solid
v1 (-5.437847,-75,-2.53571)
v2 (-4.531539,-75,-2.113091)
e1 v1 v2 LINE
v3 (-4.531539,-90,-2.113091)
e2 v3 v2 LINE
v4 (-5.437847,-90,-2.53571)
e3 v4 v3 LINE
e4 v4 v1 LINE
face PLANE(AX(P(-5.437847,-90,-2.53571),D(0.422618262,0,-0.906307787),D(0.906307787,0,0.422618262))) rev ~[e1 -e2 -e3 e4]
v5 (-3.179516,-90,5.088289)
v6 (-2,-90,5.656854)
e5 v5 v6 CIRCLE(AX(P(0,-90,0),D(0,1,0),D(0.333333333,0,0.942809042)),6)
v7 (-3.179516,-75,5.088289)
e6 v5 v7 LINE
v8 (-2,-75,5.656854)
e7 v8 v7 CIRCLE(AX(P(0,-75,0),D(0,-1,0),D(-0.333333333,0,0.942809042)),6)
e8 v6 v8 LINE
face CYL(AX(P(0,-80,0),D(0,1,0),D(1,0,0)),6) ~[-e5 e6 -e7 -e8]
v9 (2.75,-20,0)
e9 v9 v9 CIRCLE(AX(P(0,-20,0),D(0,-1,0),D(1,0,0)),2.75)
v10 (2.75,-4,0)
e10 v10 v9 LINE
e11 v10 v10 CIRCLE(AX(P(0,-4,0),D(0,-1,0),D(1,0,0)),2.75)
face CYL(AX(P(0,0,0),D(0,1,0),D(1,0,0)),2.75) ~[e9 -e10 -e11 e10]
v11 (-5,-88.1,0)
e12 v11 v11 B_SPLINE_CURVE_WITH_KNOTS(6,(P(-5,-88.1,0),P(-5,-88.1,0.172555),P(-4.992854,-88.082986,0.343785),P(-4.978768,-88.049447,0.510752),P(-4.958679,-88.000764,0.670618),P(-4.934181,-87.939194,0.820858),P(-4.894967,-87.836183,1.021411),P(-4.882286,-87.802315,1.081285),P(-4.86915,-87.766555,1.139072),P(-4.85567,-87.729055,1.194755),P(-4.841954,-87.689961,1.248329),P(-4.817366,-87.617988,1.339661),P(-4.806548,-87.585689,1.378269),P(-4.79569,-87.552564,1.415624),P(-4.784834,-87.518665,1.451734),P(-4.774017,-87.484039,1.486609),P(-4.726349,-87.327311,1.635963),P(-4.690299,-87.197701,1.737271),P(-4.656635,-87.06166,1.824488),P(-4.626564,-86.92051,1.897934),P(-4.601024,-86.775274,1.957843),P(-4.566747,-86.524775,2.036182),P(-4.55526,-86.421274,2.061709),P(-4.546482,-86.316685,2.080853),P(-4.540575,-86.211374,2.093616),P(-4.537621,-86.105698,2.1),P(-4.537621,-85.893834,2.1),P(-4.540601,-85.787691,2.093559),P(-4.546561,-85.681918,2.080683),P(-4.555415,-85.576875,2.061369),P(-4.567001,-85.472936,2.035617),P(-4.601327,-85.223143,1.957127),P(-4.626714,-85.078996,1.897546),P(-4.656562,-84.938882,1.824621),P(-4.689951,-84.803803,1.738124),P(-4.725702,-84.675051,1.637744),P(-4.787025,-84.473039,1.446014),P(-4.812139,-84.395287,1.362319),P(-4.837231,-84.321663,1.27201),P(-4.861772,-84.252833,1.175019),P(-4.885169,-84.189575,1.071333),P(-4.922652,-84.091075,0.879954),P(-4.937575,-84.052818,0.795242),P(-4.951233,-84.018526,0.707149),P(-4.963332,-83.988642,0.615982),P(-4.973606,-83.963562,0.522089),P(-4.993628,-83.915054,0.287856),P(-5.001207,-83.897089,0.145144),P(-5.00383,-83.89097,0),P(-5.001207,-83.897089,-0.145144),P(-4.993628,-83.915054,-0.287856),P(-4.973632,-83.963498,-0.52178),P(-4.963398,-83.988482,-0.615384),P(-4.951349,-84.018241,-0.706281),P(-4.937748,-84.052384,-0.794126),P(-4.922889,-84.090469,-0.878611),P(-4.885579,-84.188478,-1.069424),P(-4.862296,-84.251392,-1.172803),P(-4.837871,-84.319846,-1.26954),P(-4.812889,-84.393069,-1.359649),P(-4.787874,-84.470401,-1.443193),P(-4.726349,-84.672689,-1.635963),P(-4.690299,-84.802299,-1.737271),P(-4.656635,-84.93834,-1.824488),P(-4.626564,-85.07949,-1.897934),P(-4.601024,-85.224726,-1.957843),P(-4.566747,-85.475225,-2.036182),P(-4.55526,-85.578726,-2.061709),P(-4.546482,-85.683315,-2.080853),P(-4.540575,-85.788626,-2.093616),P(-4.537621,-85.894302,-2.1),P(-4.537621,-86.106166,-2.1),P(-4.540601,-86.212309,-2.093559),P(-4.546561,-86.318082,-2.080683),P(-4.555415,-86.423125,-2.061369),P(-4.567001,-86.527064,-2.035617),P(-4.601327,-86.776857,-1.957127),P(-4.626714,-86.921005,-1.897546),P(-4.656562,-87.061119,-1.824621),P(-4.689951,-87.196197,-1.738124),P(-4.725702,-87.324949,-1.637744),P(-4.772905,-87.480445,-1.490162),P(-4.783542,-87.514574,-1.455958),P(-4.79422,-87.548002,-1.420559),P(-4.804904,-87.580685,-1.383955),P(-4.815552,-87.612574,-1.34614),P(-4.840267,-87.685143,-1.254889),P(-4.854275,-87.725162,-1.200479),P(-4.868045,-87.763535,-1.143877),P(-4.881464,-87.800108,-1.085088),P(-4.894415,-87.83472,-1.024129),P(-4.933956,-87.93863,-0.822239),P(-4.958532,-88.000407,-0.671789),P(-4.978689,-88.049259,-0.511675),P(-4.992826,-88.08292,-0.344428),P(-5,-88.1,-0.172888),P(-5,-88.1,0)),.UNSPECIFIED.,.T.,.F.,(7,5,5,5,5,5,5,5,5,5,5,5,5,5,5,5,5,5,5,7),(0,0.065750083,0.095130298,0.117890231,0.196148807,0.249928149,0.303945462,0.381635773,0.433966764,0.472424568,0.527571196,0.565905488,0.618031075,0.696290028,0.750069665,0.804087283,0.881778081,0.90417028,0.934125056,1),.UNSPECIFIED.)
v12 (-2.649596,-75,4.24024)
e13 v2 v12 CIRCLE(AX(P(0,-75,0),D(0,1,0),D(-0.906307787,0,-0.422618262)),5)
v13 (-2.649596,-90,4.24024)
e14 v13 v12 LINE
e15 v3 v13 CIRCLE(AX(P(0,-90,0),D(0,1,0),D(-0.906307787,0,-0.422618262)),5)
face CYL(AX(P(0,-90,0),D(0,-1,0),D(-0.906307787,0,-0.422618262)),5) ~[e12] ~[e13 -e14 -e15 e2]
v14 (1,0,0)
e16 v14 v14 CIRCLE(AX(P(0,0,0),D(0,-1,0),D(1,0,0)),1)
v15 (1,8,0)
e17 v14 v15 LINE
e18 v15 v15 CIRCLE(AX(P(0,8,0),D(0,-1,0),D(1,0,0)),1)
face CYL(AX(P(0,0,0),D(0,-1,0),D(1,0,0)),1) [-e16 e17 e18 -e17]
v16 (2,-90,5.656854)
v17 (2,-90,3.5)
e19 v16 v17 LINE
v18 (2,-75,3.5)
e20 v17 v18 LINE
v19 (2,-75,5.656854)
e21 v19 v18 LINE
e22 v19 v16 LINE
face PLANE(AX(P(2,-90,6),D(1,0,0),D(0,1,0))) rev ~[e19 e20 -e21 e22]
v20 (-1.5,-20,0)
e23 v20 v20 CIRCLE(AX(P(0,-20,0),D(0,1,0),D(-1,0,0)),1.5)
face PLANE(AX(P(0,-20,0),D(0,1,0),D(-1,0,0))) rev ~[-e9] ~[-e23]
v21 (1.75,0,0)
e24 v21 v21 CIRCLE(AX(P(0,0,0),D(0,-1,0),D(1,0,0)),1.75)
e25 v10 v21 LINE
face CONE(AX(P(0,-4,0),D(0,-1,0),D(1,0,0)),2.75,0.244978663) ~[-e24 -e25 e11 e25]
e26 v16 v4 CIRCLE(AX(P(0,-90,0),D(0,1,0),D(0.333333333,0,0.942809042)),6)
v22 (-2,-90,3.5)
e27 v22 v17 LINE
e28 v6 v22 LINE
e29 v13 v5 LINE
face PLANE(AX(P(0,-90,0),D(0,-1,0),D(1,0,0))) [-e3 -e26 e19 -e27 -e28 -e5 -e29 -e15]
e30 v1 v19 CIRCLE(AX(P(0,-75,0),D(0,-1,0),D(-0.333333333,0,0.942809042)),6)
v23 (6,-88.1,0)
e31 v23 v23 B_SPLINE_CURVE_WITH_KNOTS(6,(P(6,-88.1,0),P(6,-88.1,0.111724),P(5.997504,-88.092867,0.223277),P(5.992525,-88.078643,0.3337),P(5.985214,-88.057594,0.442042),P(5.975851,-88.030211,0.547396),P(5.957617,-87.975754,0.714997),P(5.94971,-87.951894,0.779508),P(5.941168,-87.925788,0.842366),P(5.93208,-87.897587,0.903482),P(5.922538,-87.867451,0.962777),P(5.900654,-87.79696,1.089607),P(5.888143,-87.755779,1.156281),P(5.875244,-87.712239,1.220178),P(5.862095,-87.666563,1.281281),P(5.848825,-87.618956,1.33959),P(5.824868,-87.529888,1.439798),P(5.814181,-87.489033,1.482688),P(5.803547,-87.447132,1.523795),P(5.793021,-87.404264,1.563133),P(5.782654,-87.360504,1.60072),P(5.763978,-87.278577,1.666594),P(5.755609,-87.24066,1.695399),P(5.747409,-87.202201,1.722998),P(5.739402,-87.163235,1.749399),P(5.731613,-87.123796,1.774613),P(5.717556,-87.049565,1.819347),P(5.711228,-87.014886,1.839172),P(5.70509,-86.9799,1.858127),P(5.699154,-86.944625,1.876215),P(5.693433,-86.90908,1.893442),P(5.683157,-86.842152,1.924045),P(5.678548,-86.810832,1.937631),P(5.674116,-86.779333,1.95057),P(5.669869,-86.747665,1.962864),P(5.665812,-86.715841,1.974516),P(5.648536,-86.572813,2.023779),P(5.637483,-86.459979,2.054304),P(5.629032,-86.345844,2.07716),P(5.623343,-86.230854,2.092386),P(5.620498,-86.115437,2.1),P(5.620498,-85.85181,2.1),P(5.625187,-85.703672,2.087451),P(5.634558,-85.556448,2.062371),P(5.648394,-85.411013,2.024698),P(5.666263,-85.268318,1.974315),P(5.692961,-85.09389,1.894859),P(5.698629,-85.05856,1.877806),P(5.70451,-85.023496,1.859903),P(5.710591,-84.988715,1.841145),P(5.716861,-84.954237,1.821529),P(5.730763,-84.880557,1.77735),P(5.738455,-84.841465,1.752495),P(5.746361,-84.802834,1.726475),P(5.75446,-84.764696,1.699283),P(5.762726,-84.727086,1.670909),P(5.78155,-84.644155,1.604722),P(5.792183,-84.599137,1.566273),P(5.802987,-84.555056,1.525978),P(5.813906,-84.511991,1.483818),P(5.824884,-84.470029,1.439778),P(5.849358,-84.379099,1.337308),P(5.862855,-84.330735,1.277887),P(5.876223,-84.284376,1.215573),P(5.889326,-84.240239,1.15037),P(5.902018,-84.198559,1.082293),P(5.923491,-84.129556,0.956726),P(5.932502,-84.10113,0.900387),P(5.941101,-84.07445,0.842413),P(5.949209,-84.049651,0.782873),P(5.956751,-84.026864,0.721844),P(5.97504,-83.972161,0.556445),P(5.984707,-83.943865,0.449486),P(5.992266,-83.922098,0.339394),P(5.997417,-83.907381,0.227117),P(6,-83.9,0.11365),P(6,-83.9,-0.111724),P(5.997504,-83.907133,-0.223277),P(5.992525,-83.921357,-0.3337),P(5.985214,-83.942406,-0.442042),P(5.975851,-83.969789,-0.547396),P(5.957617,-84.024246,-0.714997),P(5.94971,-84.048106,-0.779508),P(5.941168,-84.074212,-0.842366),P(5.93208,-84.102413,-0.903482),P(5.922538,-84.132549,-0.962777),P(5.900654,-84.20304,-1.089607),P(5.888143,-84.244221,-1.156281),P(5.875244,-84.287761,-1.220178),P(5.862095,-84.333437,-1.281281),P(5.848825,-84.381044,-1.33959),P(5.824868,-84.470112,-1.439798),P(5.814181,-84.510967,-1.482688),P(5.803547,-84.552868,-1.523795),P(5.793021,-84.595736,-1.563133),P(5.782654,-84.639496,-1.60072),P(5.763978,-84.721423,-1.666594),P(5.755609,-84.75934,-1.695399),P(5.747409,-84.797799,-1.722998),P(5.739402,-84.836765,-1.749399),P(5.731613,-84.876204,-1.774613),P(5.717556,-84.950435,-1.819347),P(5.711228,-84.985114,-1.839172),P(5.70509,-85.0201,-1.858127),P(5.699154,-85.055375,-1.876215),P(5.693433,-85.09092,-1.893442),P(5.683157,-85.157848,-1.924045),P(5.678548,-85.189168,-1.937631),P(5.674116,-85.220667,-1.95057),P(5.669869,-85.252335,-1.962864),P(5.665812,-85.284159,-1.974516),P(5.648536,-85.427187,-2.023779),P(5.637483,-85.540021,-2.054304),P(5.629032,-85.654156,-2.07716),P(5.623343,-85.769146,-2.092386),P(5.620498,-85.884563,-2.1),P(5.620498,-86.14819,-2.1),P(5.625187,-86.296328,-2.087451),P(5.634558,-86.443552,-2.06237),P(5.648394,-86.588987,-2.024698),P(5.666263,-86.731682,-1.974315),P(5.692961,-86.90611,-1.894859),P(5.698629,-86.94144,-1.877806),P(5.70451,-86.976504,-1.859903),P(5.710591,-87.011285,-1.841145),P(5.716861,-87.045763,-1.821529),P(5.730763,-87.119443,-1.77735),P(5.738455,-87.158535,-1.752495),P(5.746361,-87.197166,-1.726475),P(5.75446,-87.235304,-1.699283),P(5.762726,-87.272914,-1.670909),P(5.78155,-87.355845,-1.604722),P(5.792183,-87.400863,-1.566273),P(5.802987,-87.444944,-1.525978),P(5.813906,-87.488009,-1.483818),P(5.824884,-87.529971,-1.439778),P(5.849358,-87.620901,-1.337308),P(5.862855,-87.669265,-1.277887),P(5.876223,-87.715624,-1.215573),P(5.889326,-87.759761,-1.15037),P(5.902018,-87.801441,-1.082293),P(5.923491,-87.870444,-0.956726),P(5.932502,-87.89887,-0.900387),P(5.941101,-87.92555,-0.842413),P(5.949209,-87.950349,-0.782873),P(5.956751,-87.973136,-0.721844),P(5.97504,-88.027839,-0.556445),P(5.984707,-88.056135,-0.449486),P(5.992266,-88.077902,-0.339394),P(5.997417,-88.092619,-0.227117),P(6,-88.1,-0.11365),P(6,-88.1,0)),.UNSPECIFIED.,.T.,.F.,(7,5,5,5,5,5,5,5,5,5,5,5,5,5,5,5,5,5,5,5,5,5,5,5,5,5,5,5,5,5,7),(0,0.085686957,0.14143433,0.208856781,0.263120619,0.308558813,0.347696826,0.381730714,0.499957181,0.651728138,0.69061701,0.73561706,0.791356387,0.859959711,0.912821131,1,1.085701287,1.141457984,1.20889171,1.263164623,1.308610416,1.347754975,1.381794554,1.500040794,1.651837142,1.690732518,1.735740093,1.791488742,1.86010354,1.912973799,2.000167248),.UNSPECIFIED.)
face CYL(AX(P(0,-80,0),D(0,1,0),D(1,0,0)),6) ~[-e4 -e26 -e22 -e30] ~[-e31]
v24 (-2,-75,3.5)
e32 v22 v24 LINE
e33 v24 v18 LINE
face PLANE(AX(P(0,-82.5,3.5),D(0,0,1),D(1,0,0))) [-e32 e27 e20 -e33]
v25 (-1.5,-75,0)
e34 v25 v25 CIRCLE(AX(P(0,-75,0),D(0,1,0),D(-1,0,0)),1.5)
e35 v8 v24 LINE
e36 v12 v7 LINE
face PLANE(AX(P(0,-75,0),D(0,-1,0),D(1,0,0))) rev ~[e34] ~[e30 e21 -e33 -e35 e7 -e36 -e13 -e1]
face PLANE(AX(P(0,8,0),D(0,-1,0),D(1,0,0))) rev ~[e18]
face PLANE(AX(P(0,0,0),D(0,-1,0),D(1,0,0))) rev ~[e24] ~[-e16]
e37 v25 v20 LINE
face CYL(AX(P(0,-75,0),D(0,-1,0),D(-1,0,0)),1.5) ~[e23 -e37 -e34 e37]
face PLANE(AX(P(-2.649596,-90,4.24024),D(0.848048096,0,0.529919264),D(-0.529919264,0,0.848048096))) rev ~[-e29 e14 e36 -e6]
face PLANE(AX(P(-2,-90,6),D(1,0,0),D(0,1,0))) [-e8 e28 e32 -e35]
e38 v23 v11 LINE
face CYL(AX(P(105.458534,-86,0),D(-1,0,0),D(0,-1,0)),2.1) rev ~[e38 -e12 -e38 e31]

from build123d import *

# Parameters (mm, degrees)
F0_R      = 1
F1_DEPTH  = 8
F2_R      = 2.75
F3_DEPTH  = 80
F4_SIZE2  = 1
F4_SIZE   = 4
F5_R      = 6
F5_R_2    = 2.75
F6_DEPTH  = 5
F7_DEPTH  = 10
F12_R     = 2.75
F12_R_2   = 1.5
F13_DEPTH = 55
F15_D     = 4.2
F16_W     = 4
F16_H     = 15
F17_DEPTH = 2.5
F24_DEPTH = 15


with BuildPart() as f1:
    # F0 (on Front) → F1 (new body)
    with BuildSketch(Plane.XZ):
        Circle(F0_R)
    extrude(amount=-F1_DEPTH)

    # F2 (on face) → F3 (join)
    with BuildSketch(Plane.XZ):
        Circle(F2_R)
    extrude(amount=F3_DEPTH)

    # F4
    f4_edges = [f1.edges().sort_by_distance(p)[0] for p in [
        (-2.75, 0, 0),
    ]]
    f4_side = f1.faces().sort_by_distance((-2.75, -40, 0))[0]
    chamfer(f4_edges, length=F4_SIZE, length2=F4_SIZE2, reference=f4_side)

    # F5 (on face) → F6 (join)
    with BuildSketch(Plane.XZ.offset(80)):
        Circle(F5_R)
        Circle(F5_R_2, mode=Mode.SUBTRACT)
    extrude(amount=-F6_DEPTH)

    # F7 (add): a face of the model
    f7_faces = [f1.faces().sort_by_distance(p)[0] for p in [
        (0, -80, 0),
    ]]
    extrude(f7_faces, amount=F7_DEPTH)

    # F12 (on face) → F13 (cut)
    with BuildSketch(Plane(origin=(0, -75, 0), x_dir=(-1, 0, 0), z_dir=(0, 1, 0))):
        Circle(F12_R)
        Circle(F12_R_2, mode=Mode.SUBTRACT)
    extrude(amount=F13_DEPTH, mode=Mode.SUBTRACT)

    # F15 (through all)
    with Locations(Plane.YZ.offset(6)):
        with Locations((-86, 0)):
            Hole(F15_D / 2)

    # F16 (on offset) → F17 (cut)
    with BuildSketch(Plane.XY.offset(6)):
        with Locations((0, -82.5)):
            Rectangle(F16_W, F16_H)
    extrude(amount=-F17_DEPTH, mode=Mode.SUBTRACT)

    # F23 (on face) → F24 (cut)
    with BuildSketch(Plane.XZ.offset(90)):
        with BuildLine():
            ThreePointArc((-3.1795155854, 5.0882885769), (-5.7529184092, 1.7040920682), (-5.4378467222, -2.5357095704))
            Line((-5.4378467222, -2.5357095704), (-4.5315389352, -2.1130913087))
            ThreePointArc((-4.5315389352, -2.1130913087), (-4.7940986743, 1.4200767235), (-2.6495963212, 4.2402404808))
            Line((-2.6495963212, 4.2402404808), (-3.1795155854, 5.0882885769))
        make_face()
    extrude(amount=-F24_DEPTH, mode=Mode.SUBTRACT)


solid = f1.part
